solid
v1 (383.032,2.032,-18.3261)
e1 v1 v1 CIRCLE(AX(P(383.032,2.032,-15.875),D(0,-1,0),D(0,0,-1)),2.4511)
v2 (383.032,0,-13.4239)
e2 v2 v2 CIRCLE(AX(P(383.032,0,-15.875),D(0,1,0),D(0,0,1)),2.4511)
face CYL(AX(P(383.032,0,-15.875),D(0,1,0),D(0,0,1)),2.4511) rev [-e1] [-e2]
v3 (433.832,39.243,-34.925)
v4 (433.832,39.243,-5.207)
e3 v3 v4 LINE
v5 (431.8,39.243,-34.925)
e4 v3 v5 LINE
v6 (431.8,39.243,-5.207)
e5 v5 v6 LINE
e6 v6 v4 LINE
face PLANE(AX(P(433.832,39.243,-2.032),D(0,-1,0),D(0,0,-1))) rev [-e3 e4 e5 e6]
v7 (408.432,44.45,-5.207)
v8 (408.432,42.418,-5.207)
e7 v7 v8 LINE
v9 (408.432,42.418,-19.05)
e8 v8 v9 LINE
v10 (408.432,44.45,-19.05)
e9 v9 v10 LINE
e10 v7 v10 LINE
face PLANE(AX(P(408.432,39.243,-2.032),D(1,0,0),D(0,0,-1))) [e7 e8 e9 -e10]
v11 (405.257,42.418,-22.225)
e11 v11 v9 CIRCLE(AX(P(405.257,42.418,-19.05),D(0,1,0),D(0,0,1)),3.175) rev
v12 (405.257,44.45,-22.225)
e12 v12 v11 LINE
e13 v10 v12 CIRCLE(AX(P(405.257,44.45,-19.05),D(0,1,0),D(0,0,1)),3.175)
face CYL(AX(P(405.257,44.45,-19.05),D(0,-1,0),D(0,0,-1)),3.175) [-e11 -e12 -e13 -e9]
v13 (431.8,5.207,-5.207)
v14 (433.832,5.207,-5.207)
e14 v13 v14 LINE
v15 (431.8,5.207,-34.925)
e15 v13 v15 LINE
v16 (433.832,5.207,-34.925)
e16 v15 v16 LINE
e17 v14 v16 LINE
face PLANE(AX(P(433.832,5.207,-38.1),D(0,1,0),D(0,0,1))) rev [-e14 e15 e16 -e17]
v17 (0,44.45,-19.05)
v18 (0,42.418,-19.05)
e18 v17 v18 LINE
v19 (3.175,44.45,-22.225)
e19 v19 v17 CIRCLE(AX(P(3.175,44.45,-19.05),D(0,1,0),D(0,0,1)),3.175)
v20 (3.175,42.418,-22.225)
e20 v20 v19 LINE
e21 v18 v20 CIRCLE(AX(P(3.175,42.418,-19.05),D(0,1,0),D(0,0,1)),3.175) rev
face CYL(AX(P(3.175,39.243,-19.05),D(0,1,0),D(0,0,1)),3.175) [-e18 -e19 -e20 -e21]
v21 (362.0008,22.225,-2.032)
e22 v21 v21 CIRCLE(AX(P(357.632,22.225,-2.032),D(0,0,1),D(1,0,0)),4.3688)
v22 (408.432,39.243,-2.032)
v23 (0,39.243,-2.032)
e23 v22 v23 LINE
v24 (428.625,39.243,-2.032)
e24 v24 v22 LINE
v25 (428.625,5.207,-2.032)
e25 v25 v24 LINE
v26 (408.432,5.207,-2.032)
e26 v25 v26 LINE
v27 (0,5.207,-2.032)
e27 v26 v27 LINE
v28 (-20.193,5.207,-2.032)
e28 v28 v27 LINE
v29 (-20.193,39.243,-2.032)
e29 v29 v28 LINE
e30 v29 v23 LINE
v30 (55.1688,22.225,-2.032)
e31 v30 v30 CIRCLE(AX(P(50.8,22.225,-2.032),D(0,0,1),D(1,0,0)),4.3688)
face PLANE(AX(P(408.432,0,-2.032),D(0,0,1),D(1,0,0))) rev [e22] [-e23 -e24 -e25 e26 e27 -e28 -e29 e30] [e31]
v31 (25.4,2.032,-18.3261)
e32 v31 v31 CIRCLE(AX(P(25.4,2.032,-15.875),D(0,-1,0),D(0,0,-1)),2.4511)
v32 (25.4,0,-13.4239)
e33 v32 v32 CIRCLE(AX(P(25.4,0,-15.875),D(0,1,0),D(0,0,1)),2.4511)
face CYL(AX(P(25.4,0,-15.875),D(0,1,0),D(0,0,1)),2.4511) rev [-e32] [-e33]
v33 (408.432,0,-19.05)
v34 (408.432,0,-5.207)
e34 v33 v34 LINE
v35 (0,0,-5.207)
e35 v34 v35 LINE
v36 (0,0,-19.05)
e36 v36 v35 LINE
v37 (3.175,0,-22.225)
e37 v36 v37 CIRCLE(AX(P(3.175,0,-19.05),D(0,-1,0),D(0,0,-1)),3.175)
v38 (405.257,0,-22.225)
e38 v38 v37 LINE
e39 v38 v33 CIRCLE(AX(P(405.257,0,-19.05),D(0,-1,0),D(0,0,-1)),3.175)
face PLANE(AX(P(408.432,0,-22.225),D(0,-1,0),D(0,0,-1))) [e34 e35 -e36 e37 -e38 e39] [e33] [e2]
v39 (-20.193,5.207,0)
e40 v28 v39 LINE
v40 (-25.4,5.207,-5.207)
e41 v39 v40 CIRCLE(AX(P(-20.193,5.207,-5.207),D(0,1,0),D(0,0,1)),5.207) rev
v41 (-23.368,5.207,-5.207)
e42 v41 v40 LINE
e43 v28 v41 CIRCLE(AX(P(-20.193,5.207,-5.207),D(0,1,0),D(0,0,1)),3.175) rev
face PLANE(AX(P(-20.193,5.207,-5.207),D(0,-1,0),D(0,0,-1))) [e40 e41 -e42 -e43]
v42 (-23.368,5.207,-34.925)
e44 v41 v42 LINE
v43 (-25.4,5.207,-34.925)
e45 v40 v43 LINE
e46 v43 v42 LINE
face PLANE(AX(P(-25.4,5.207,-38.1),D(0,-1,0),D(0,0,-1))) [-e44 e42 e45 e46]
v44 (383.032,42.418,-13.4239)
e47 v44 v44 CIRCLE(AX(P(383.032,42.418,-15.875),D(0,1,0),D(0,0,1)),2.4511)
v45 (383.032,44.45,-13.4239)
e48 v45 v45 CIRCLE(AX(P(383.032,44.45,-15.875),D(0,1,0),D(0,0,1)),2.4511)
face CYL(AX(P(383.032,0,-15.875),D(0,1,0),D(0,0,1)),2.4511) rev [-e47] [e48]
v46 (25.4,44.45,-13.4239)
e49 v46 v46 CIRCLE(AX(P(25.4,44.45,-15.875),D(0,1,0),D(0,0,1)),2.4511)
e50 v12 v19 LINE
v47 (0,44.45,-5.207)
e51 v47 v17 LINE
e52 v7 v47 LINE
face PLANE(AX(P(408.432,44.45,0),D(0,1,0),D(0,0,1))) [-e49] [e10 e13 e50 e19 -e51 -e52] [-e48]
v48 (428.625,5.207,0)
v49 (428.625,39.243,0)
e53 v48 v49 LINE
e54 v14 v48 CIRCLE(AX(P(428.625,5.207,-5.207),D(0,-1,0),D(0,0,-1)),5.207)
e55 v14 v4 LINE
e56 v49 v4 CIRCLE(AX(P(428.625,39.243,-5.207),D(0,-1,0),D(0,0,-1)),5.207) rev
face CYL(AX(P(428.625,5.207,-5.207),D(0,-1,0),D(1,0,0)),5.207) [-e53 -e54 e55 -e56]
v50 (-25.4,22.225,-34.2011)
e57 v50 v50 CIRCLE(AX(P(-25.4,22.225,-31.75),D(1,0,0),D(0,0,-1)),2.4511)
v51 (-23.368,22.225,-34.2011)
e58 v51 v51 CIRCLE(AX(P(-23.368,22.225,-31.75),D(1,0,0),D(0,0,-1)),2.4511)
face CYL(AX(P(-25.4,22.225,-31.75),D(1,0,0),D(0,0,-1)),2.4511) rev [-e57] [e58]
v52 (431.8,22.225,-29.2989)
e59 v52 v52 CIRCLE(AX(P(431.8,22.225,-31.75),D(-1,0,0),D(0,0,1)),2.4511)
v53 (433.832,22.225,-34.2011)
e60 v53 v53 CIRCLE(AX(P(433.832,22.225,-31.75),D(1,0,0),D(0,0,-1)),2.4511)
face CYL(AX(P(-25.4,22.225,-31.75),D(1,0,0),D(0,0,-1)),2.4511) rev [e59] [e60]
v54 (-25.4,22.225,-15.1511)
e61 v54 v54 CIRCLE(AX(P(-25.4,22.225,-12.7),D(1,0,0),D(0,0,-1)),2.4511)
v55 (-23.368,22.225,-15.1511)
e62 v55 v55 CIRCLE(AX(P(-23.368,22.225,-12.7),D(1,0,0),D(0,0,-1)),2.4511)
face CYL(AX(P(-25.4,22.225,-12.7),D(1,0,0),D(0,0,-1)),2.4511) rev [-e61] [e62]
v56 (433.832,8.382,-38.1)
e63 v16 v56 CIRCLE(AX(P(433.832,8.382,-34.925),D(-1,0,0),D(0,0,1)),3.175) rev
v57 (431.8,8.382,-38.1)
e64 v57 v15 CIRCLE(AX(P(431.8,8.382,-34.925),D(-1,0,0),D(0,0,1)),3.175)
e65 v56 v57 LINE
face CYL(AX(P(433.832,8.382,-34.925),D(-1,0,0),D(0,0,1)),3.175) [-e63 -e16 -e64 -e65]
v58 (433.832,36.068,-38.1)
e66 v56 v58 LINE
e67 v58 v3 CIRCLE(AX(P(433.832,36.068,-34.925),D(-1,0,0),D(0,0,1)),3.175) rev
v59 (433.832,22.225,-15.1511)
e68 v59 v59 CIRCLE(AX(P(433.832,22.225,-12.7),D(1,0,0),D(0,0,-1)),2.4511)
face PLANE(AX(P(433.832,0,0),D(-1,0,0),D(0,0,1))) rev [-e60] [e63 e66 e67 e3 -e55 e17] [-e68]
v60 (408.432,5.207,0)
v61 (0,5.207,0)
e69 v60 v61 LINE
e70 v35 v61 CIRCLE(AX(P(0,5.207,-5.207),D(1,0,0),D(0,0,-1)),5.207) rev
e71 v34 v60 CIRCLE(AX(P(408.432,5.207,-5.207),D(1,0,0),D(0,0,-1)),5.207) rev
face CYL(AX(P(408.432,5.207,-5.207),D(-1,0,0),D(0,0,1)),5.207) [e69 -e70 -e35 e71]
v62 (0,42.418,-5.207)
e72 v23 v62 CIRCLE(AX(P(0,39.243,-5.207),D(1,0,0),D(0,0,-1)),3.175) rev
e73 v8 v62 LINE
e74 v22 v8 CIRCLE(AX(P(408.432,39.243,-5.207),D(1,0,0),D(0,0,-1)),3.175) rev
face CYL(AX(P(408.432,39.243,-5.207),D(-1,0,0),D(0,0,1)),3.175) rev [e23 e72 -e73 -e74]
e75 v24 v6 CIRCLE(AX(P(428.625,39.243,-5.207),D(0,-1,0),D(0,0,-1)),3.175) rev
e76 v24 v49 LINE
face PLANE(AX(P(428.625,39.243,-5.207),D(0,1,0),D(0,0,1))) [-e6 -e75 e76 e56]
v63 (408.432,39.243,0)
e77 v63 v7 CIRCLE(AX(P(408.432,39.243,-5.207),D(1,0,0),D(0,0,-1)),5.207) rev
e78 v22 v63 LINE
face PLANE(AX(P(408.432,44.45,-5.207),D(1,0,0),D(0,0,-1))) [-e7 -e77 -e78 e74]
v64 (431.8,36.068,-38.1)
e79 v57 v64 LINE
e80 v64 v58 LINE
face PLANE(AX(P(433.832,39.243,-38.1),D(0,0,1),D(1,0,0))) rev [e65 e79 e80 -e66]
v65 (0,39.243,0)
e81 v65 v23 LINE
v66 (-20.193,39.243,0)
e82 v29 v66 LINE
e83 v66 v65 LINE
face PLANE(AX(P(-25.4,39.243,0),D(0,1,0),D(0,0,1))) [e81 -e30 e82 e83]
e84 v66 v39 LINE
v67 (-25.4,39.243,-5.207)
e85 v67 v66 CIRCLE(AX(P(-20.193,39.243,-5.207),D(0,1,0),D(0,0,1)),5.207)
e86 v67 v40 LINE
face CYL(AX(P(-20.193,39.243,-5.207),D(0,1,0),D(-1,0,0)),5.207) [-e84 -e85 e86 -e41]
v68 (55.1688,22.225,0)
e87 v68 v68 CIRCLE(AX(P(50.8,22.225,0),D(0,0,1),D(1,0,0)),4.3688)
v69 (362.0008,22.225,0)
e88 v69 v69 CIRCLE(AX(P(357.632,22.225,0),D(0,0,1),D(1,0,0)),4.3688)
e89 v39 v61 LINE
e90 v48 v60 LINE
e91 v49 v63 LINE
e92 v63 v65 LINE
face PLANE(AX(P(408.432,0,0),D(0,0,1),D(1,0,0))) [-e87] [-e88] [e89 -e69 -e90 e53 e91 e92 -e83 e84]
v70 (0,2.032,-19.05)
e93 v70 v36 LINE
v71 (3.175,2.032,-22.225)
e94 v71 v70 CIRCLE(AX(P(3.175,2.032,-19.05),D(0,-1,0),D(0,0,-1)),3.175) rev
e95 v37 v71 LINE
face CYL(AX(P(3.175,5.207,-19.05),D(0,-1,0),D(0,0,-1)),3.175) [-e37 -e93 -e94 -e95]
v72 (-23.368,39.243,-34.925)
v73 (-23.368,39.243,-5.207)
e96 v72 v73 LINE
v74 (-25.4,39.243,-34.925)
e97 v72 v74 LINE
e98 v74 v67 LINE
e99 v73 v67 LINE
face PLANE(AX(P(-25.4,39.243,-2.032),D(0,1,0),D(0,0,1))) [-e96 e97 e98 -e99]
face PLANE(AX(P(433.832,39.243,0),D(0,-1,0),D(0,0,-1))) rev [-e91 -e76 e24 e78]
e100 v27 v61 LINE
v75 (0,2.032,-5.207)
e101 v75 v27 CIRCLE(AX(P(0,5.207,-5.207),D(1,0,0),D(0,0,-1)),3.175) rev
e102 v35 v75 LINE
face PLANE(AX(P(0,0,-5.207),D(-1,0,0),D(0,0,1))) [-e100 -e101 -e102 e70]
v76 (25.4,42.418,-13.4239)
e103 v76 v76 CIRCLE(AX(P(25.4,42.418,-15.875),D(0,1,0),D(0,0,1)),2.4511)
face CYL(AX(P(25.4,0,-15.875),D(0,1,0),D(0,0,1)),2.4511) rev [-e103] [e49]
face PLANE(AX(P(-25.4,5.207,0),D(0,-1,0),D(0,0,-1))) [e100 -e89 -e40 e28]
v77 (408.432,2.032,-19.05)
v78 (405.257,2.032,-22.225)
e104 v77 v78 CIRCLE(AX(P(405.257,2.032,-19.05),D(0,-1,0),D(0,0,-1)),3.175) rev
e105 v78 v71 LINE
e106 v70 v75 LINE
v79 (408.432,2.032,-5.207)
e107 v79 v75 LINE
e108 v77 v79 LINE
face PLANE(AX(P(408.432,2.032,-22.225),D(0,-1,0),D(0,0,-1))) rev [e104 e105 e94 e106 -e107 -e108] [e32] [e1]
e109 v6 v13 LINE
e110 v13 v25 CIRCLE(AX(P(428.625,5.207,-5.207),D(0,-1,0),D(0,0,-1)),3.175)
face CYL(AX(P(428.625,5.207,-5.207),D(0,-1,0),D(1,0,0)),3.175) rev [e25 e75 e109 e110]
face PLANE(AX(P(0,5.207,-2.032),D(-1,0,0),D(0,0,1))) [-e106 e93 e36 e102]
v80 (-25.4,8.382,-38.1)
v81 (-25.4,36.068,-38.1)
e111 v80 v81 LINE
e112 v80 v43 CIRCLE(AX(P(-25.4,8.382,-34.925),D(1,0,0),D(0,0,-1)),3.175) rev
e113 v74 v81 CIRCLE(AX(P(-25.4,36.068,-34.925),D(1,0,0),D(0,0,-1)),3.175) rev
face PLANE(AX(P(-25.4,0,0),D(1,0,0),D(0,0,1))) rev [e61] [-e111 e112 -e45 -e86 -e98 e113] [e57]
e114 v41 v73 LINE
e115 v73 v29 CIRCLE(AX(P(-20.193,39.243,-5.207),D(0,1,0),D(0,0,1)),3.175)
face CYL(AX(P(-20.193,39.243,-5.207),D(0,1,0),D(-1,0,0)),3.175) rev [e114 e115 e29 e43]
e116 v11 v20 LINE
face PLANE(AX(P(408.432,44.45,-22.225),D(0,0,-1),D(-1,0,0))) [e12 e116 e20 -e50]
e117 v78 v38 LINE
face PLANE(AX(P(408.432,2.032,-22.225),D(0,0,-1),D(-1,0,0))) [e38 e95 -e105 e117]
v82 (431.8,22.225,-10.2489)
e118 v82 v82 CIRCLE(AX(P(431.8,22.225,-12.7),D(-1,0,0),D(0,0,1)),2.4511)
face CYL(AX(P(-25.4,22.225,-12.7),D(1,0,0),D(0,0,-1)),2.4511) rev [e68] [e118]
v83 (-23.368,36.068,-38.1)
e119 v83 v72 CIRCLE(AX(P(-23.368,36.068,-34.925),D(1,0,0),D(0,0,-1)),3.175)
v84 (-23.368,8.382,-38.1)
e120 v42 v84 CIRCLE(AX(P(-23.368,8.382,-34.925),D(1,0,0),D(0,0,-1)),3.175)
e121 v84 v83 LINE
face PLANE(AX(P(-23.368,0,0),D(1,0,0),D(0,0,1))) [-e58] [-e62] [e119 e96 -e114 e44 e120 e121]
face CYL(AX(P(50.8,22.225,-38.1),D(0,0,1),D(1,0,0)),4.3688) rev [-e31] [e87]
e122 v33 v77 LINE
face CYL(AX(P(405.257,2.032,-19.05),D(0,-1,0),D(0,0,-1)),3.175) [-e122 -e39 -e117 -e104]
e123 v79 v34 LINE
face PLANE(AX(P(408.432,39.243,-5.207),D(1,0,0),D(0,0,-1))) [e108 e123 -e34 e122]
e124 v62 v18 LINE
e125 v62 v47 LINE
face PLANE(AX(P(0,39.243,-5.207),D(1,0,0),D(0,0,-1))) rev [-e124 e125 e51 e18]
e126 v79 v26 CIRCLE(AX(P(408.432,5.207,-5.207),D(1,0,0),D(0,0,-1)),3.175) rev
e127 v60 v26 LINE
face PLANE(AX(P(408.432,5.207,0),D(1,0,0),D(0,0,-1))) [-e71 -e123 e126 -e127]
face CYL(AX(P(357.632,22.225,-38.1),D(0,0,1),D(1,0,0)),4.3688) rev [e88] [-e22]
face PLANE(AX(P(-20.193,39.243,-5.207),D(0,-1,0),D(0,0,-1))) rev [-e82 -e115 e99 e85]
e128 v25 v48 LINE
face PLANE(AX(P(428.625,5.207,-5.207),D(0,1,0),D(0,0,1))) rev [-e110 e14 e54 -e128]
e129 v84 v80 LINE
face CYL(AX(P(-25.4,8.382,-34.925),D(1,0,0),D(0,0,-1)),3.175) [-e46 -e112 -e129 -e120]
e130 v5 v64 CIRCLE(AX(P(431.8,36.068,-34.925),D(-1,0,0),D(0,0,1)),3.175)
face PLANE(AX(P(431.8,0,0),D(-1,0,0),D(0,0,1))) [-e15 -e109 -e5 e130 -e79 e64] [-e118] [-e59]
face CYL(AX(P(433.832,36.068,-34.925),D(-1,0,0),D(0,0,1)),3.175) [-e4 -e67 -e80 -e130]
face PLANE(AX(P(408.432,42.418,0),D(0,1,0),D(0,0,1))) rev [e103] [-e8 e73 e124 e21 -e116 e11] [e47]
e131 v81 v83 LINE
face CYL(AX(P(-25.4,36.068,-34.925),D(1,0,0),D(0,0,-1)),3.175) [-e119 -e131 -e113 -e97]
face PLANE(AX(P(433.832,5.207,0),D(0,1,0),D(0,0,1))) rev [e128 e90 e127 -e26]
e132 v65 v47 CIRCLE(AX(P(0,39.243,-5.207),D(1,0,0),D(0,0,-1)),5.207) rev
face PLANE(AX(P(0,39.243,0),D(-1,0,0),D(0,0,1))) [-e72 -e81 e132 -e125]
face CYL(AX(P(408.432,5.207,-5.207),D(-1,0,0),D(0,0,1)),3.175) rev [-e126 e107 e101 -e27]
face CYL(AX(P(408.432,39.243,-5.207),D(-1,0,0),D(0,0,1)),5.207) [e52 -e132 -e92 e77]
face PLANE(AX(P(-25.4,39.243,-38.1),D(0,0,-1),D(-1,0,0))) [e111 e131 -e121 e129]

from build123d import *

# Parameters (mm, degrees)
BASE_FLANGE1_DEPTH           = 408.432
SKETCH2_W                    = 2.032
SKETCH2_H                    = 34.036
BOSS_EXTRUDE1_DEPTH          = 25.4
EDGE_FLANGE1_STRIP_W         = 14.478
EDGE_FLANGE1_STRIP_H         = 2.032
EDGE_FLANGE1_STRIP_CUT_DEPTH = 34.036
EDGE_FLANGE1_DEPTH           = 34.036
SKETCH6_R                    = 2.4511
CUT_EXTRUDE1_DEPTH           = 438.764339256
SKETCH7_R                    = 4.3688
CUT_EXTRUDE2_DEPTH           = 438.764339256
SKETCH8_R                    = 2.4511
CUT_EXTRUDE3_DEPTH           = 463.94863897
FILLET1_R                    = 3.175


# Sheet-metal steps are written as plain solids
with BuildPart() as part:
    # Sketch1 → Base-Flange1 (new body)
    with BuildSketch(Plane(origin=(0, 0, 0), x_dir=(0, 0, -1), z_dir=(1, 0, 0))):
        with BuildLine():
            Line((22.225, 0), (5.207, 0))
            ThreePointArc((5.207, 0), (1.52509499, 1.52509499), (0, 5.207))
            Line((0, 5.207), (0, 39.243))
            ThreePointArc((0, 39.243), (1.52509499, 42.92490501), (5.207, 44.45))
            Line((5.207, 44.45), (22.225, 44.45))
            Line((22.225, 44.45), (22.225, 42.418))
            Line((22.225, 42.418), (5.207, 42.418))
            ThreePointArc((5.207, 42.418), (2.96193597, 41.48806403), (2.032, 39.243))
            Line((2.032, 39.243), (2.032, 5.207))
            ThreePointArc((2.032, 5.207), (2.96193597, 2.96193597), (5.207, 2.032))
            Line((5.207, 2.032), (22.225, 2.032))
            Line((22.225, 2.032), (22.225, 0))
        make_face()
    extrude(amount=BASE_FLANGE1_DEPTH)

    # Sketch2 → Boss-Extrude1 (add)
    with BuildSketch(Plane(origin=(408.432, 0, 0), x_dir=(0, 0, -1), z_dir=(1, 0, 0))):
        with Locations((1.016, 22.225)):
            Rectangle(SKETCH2_W, SKETCH2_H)
    boss_extrude1 = extrude(amount=BOSS_EXTRUDE1_DEPTH)

    # Edge-Flange1 strip (across the edge) → Edge-Flange1 strip cut (cut)
    with BuildSketch(Plane(origin=(433.832, 39.243, -2.032), x_dir=(-1, 0, 0), z_dir=(0, -1, 0))):
        with Locations((-2.032, -1.016)):
            Rectangle(EDGE_FLANGE1_STRIP_W, EDGE_FLANGE1_STRIP_H)
    edge_flange1_strip_cut = extrude(amount=EDGE_FLANGE1_STRIP_CUT_DEPTH, mode=Mode.SUBTRACT)

    # Edge-Flange1 section (across the edge) → Edge-Flange1 (add)
    with BuildSketch(Plane(origin=(433.832, 39.243, -2.032), x_dir=(-1, 0, 0), z_dir=(0, -1, 0))):
        with BuildLine():
            Line((0, 3.175), (0, 36.068))
            Line((0, 36.068), (2.032, 36.068))
            Line((2.032, 36.068), (2.032, 3.175))
            ThreePointArc((2.032, 3.175), (2.96193597, 0.92993597), (5.207, 0))
            Line((5.207, 0), (5.207, -2.032))
            ThreePointArc((5.207, -2.032), (1.52509499, -0.50690501), (0, 3.175))
        make_face()
    edge_flange1 = extrude(amount=EDGE_FLANGE1_DEPTH)

    # Mirror1: Boss-Extrude1, Edge-Flange1 strip cut, Edge-Flange1 across plane
    add(boss_extrude1.mirror(Plane.ZY.offset(-204.216)))
    add(edge_flange1_strip_cut.mirror(Plane.ZY.offset(-204.216)), mode=Mode.SUBTRACT)
    add(edge_flange1.mirror(Plane.ZY.offset(-204.216)))

    # Sketch6 → Cut-Extrude1 (cut, through all)
    with BuildSketch(Plane(origin=(0, 44.45, 0), x_dir=(1, 0, 0), z_dir=(0, 1, 0))):
        with Locations(Location((25.4, 15.875, 0), (0, 0, 270))):
            Circle(SKETCH6_R)
        with Locations(Location((383.032, 15.875, 0), (0, 0, 270))):
            Circle(SKETCH6_R)
    extrude(amount=-CUT_EXTRUDE1_DEPTH, mode=Mode.SUBTRACT)

    # Sketch7 → Cut-Extrude2 (cut, through all)
    with BuildSketch(Plane.XY):
        with Locations((50.8, 22.225)):
            Circle(SKETCH7_R)
        with Locations((357.632, 22.225)):
            Circle(SKETCH7_R)
    extrude(amount=-CUT_EXTRUDE2_DEPTH, mode=Mode.SUBTRACT)

    # Sketch8 → Cut-Extrude3 (cut, through all)
    with BuildSketch(Plane(origin=(433.832, 0, 0), x_dir=(0, 0, -1), z_dir=(1, 0, 0))):
        with Locations((31.75, 22.225)):
            Circle(SKETCH8_R)
        with Locations((12.7, 22.225)):
            Circle(SKETCH8_R)
    extrude(amount=-CUT_EXTRUDE3_DEPTH, mode=Mode.SUBTRACT)

    # Fillet1
    fillet1_edges = [part.edges().sort_by_distance(p)[0] for p in [
        (-24.384, 5.207, -38.1),
        (0, 1.016, -22.225),
        (-24.384, 39.243, -38.1),
        (0, 43.434, -22.225),
        (408.432, 1.016, -22.225),
        (432.816, 39.243, -38.1),
        (432.816, 5.207, -38.1),
        (408.432, 43.434, -22.225),
    ]]
    fillet(fillet1_edges, radius=FILLET1_R)


solid = part.part
